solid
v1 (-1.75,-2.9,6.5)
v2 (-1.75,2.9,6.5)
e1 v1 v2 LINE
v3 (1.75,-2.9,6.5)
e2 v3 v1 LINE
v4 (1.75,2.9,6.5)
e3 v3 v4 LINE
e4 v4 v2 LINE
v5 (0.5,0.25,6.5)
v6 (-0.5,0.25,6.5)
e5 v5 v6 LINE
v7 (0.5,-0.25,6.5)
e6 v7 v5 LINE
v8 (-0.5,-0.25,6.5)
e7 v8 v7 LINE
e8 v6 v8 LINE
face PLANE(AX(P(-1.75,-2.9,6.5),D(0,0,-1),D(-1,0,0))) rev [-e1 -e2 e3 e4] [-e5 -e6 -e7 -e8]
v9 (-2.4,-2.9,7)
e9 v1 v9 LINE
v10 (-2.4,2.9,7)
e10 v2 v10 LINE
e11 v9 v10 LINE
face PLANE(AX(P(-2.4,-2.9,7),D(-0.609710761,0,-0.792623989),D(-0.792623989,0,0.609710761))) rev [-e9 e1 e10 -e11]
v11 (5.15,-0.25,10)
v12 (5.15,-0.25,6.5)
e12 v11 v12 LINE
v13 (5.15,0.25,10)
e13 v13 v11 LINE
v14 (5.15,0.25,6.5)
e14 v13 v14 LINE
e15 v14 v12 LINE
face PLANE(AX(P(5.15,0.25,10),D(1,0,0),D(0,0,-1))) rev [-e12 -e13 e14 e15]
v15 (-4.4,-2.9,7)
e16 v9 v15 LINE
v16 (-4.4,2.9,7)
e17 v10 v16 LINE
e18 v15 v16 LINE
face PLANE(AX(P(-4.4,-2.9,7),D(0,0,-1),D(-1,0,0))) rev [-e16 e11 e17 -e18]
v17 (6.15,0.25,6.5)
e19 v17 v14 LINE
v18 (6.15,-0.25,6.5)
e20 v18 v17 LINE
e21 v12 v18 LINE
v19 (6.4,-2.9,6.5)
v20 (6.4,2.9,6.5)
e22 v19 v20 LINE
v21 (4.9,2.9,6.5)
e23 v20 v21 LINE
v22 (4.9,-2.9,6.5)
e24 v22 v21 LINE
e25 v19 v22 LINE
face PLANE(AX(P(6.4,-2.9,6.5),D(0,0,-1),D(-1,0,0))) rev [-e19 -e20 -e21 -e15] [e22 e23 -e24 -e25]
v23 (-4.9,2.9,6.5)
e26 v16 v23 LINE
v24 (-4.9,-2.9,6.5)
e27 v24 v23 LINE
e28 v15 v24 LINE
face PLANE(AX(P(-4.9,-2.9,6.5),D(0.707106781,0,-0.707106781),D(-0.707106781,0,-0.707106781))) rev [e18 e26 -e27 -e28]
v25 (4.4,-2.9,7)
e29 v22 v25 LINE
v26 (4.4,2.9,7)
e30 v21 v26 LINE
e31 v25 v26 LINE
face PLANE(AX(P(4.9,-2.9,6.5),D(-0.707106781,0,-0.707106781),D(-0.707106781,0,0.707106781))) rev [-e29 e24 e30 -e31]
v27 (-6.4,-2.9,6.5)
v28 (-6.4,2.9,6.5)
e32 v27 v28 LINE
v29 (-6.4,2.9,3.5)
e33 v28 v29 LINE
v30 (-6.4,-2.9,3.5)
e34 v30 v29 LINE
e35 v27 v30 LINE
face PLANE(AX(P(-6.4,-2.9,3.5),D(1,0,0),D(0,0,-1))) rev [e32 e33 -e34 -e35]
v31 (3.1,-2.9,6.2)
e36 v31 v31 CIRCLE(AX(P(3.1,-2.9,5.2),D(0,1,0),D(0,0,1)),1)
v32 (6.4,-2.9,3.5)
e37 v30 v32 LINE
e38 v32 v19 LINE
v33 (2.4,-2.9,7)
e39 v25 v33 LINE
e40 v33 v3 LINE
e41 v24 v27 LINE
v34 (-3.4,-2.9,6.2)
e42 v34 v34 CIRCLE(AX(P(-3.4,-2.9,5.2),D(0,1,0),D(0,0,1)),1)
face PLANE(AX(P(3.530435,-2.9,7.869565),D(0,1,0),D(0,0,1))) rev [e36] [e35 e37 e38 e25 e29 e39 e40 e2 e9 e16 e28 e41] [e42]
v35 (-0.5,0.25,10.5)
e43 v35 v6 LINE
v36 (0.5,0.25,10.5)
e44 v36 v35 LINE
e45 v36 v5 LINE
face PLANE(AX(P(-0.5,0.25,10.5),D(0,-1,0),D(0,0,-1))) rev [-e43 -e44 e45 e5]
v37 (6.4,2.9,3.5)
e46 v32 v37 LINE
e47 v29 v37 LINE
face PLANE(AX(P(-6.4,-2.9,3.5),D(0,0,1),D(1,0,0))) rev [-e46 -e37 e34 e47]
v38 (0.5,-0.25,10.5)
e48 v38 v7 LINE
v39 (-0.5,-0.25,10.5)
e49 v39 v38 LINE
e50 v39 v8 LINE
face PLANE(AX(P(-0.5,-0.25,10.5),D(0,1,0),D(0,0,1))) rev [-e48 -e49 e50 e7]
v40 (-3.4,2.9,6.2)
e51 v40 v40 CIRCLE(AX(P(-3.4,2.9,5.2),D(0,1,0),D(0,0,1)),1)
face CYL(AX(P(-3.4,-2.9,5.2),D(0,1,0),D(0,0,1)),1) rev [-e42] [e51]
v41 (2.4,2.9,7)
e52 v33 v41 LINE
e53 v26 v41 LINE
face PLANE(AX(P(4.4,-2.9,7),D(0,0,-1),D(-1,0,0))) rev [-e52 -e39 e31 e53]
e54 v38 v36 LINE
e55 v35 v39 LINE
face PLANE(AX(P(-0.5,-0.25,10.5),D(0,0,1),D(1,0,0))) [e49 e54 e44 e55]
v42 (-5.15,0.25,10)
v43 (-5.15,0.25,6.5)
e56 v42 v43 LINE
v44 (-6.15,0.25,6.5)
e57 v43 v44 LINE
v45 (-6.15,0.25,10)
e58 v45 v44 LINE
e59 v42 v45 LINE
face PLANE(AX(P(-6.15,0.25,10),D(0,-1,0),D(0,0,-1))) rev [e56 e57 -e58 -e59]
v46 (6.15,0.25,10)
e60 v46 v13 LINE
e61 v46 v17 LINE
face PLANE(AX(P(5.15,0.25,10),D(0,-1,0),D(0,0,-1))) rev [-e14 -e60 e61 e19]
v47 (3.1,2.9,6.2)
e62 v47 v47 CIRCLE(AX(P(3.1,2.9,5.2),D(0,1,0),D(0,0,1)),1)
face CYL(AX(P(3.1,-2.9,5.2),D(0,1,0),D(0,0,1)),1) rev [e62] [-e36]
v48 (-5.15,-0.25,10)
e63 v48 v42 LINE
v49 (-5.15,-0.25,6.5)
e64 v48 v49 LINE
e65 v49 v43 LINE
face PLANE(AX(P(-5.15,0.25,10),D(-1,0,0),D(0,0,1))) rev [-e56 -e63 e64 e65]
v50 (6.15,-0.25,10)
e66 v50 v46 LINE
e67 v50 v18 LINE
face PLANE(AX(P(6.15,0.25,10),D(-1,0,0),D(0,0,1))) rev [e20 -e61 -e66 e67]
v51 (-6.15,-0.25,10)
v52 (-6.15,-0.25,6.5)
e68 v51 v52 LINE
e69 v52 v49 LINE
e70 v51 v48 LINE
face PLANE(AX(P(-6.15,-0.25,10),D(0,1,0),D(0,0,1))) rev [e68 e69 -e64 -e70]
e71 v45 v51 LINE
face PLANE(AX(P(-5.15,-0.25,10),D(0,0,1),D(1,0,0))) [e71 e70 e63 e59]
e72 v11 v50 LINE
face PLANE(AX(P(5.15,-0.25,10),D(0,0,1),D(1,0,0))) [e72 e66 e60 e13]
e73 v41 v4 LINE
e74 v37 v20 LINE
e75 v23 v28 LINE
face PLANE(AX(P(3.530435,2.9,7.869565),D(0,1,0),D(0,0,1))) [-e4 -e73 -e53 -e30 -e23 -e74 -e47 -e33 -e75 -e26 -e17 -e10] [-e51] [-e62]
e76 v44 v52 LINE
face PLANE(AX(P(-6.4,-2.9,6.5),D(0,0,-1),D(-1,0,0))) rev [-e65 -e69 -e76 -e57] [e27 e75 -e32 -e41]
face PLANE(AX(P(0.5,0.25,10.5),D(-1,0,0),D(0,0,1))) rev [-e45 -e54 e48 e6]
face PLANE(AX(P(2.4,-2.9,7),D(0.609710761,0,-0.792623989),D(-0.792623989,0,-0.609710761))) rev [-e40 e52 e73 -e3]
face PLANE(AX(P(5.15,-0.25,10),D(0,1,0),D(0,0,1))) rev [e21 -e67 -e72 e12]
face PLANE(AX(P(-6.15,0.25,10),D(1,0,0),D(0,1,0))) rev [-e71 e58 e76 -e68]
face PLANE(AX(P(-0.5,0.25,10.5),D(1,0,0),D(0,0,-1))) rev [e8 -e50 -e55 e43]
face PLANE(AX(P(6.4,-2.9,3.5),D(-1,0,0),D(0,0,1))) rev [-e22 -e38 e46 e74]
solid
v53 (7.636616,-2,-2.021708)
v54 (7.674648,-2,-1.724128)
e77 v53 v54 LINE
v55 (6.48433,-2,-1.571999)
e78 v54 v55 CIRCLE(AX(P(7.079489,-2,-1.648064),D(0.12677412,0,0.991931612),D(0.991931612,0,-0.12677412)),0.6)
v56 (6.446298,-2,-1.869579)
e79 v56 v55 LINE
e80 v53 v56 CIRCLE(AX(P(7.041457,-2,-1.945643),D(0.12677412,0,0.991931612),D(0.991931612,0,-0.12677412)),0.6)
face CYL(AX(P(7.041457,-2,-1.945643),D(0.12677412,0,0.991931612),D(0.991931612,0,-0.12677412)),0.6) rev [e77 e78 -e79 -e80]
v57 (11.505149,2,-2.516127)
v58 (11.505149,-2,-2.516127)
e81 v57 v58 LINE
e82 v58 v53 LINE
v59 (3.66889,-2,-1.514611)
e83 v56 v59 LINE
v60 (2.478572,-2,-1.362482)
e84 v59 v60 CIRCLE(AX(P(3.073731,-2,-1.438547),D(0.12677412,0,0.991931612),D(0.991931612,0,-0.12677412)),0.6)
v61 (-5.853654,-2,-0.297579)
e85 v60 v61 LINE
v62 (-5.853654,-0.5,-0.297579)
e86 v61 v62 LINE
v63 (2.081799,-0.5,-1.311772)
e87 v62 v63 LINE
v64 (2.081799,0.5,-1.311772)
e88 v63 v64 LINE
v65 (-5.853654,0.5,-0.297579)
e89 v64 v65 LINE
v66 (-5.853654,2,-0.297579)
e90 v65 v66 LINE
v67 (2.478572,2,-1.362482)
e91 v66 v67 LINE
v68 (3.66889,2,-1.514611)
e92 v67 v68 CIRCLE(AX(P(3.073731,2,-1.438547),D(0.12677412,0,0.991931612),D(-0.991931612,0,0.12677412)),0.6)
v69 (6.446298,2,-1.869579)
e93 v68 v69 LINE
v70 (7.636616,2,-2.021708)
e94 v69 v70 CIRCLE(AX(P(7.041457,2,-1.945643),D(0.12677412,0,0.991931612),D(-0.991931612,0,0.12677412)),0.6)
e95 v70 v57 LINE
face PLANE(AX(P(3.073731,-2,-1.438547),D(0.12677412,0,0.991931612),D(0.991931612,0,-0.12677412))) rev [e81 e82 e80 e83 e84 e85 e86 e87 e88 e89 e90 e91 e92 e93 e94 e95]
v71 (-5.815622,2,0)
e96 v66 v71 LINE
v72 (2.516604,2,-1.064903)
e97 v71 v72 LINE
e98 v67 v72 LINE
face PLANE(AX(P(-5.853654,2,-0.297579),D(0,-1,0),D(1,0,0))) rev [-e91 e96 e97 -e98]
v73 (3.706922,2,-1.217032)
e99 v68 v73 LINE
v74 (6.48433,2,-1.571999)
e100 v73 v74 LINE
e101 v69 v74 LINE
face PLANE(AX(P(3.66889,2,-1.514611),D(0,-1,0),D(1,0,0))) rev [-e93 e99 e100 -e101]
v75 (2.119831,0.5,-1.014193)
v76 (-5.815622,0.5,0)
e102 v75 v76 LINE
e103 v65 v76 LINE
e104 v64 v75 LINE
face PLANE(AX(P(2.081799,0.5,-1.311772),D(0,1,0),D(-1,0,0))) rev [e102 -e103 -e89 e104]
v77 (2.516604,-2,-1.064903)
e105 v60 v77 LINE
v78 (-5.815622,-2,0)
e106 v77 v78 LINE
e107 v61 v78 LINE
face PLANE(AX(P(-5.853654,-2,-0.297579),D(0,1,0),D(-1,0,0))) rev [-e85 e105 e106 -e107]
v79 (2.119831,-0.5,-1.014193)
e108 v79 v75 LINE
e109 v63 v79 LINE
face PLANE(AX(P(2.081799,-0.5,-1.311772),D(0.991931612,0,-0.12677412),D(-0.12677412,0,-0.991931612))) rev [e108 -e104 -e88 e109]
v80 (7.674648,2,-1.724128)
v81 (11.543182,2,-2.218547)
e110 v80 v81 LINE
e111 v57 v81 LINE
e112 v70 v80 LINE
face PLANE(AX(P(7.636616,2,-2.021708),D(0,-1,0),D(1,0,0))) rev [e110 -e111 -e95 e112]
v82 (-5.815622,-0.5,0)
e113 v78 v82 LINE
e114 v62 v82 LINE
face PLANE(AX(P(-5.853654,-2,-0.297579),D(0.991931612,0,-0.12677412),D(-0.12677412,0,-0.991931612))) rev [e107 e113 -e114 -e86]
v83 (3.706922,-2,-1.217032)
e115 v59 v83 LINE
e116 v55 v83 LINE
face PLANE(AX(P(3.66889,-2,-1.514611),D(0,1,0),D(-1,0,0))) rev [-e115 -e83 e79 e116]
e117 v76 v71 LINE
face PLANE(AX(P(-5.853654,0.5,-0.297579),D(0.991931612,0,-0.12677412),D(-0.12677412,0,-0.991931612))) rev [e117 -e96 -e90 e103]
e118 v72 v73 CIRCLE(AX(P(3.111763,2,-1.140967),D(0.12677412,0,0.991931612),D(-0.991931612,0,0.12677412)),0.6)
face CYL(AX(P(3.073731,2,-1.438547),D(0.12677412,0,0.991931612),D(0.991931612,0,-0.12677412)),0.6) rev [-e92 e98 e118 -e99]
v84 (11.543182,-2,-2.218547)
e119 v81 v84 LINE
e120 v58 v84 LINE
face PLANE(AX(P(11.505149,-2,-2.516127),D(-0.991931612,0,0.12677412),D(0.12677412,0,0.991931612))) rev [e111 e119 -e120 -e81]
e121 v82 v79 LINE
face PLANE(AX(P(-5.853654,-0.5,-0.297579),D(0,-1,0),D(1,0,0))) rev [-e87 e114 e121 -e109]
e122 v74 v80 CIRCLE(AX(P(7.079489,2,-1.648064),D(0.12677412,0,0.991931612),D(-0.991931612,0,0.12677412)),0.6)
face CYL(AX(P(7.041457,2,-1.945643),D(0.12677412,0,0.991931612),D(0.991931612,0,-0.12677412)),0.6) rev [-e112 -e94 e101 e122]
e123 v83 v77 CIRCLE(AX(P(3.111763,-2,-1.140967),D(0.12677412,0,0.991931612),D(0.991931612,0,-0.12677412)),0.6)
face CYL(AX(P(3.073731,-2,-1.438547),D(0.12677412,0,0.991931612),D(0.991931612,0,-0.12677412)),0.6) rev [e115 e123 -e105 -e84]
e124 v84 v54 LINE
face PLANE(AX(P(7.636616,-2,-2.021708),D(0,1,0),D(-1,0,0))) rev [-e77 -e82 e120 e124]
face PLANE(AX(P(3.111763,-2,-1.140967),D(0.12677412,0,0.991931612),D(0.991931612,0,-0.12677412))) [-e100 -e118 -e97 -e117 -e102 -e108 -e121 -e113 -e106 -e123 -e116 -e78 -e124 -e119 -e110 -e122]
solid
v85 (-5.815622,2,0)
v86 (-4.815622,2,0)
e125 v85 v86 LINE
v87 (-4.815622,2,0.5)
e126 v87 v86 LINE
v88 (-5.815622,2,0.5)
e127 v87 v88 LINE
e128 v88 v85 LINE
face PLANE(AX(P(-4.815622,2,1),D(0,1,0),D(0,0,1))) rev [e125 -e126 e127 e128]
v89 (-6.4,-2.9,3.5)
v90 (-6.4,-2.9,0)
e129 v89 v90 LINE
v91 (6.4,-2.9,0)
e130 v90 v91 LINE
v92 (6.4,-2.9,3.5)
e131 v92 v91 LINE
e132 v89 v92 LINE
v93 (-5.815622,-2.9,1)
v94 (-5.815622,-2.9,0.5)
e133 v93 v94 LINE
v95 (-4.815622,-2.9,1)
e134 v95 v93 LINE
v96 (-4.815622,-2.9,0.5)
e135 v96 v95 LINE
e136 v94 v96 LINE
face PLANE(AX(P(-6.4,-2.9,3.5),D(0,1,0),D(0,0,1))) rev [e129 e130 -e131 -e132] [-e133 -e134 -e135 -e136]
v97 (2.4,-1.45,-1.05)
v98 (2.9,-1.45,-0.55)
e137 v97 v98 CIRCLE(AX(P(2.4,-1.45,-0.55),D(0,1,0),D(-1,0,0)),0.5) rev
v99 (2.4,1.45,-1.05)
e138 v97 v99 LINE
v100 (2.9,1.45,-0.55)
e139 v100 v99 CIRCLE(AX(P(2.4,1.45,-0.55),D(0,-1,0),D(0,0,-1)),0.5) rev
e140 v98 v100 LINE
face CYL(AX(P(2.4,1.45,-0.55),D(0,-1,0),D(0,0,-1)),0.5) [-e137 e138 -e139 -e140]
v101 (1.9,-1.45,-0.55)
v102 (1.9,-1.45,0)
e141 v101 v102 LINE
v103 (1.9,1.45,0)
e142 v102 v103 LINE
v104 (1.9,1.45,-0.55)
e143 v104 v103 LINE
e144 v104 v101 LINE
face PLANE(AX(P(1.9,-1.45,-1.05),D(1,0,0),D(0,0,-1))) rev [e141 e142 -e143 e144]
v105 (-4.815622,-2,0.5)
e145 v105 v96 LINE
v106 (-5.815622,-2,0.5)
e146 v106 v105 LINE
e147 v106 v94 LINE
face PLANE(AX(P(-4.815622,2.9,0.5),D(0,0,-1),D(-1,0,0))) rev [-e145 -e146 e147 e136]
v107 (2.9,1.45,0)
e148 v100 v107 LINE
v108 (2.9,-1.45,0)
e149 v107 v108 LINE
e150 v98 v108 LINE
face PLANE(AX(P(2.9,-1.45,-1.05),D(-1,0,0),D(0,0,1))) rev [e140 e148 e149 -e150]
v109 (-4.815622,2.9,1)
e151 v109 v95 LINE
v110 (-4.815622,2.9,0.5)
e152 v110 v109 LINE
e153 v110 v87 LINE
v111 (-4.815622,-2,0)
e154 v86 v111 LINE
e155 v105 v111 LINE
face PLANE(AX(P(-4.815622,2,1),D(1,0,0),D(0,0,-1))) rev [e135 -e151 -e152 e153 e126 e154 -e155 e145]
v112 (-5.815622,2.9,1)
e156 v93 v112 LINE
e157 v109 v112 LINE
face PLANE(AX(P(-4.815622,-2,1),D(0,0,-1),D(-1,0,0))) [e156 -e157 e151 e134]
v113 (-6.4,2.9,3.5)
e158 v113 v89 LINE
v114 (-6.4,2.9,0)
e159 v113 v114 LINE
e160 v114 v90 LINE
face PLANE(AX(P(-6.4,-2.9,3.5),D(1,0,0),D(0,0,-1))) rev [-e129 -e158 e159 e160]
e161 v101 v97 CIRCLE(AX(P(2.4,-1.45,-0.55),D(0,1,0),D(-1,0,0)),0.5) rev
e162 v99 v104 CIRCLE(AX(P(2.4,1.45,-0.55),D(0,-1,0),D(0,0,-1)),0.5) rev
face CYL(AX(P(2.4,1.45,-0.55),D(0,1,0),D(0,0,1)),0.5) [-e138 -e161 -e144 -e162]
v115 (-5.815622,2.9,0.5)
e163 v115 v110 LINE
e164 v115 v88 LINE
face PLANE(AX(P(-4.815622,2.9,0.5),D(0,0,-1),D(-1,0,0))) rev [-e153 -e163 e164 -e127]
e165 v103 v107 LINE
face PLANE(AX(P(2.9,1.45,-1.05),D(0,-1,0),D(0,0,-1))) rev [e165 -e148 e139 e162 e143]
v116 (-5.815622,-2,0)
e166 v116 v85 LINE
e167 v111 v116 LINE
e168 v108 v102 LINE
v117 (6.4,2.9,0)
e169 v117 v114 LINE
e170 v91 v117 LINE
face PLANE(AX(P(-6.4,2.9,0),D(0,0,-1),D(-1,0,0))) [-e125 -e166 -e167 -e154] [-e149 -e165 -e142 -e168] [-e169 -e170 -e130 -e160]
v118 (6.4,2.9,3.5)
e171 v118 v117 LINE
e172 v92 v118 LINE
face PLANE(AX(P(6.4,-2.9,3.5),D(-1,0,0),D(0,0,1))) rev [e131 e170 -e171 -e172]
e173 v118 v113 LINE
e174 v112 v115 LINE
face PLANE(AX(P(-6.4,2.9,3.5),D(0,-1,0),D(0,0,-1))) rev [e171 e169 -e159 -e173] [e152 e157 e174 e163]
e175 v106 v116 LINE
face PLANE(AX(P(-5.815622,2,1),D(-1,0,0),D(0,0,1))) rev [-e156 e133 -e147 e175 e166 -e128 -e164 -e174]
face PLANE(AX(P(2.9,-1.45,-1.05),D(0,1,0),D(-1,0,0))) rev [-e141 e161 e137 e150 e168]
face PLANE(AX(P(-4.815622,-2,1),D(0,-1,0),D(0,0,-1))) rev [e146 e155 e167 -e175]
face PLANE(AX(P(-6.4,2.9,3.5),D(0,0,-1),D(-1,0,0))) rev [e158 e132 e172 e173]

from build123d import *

# Parameters (mm, degrees)
SKETCH_1_W            = 12.8
SKETCH_1_H            = 5.8
EXTRUDE_1_DEPTH       = 3.5
SKETCH_2_W            = 1
SKETCH_2_H            = 2.9
EXTRUDE_2_DEPTH       = 1.05
FILLET_1_R            = 0.5
SKETCH_3_W            = 1
SKETCH_3_H            = 4
CUT_EXTRUDE_1_DEPTH   = 1
SKETCH_4_W            = 1
SKETCH_4_H            = 0.5
CUT_EXTRUDE_2_DEPTH   = 10.31933474
EXTRUDE_110_DEPTH     = 5.8
SKETCH_6_W            = 1
SKETCH_6_H            = 0.5
EXTRUDE_3_DEPTH       = 4
SKETCH_5_W            = 1
SKETCH_5_H            = 0.5
EXTRUDE_210_DEPTH     = 3.5
SKETCH_7_R            = 1
CUT_EXTRUDE_110_DEPTH = 17.293966082
EXTRUDE_212_DEPTH     = 0.3


with BuildPart() as part:
    # Эскиз1 → Вытянуть1 (new body)
    with BuildSketch(Plane.XY):
        Rectangle(SKETCH_1_W, SKETCH_1_H)
    extrude(amount=EXTRUDE_1_DEPTH)

    # Эскиз2 → Вытянуть2 (add)
    with BuildSketch(Plane(origin=(0, 0, 0), x_dir=(-1, 0, 0), z_dir=(0, 0, -1))):
        with Locations((-2.4, 0)):
            Rectangle(SKETCH_2_W, SKETCH_2_H)
    extrude(amount=EXTRUDE_2_DEPTH)

    # Скругление1
    fillet_1_edges = [part.edges().sort_by_distance(p)[0] for p in [
        (2.9, 0, -1.05),
        (1.9, 0, -1.05),
    ]]
    fillet(fillet_1_edges, radius=FILLET_1_R - 0.0001)  # a hair under: the kernel refuses the full size

    # Эскиз3 → Вырез-Вытянуть1 (cut)
    with BuildSketch(Plane(origin=(0, 0, 0), x_dir=(-1, 0, 0), z_dir=(0, 0, -1))):
        with Locations((5.31562156, 0)):
            Rectangle(SKETCH_3_W, SKETCH_3_H)
    extrude(amount=-CUT_EXTRUDE_1_DEPTH, mode=Mode.SUBTRACT)

    # Эскиз4 → Вырез-Вытянуть2 (cut, through all)
    with BuildSketch(Plane.XZ.offset(2.9)):
        with Locations((-5.31562156, 0.75)):
            Rectangle(SKETCH_4_W, SKETCH_4_H)
    extrude(amount=-CUT_EXTRUDE_2_DEPTH, mode=Mode.SUBTRACT)


with BuildPart() as body_2:
    # Эскиз110 → Вытянуть110 (new body)
    with BuildSketch(Plane(origin=(1.592474691, 2.9, -4.760466002), x_dir=(1, 0, 0), z_dir=(0, -1, 0))):
        Polygon((-7.992474691, 8.260466002), (4.807525309, 8.260466002), (4.807525309, 11.260466002), (3.307525309, 11.260466002), (2.807525309, 11.760466002), (0.807525309, 11.760466002), (0.157525309, 11.260466002), (-3.342474691, 11.260466002), (-3.992474691, 11.760466002), (-5.992474691, 11.760466002), (-6.492474691, 11.260466002), (-7.992474691, 11.260466002), align=None)
    extrude(amount=EXTRUDE_110_DEPTH)

    # Эскиз6 → Вытянуть3 (add)
    with BuildSketch(Plane(origin=(-1.592474691, 3.5, 6.5), x_dir=(1, 0, 0), z_dir=(0, 0, 1))):
        with Locations((1.592474691, -3.5)):
            Rectangle(SKETCH_6_W, SKETCH_6_H)
    extrude(amount=EXTRUDE_3_DEPTH)

    # Эскиз5 → Вытянуть210 (add)
    with BuildSketch(Plane(origin=(-1.592474691, 3.5, 6.5), x_dir=(1, 0, 0), z_dir=(0, 0, 1))):
        with Locations((-4.057525309, -3.5)):
            Rectangle(SKETCH_5_W, SKETCH_5_H)
        with Locations((7.242474691, -3.5)):
            Rectangle(SKETCH_5_W, SKETCH_5_H)
    extrude(amount=EXTRUDE_210_DEPTH)

    # Эскиз7 → Вырез-Вытянуть110 (cut, through all)
    with BuildSketch(Plane(origin=(1.592474691, 2.9, -2.460466002), x_dir=(-1, 0, 0), z_dir=(0, 1, 0))):
        with Locations(Location((-1.507525309, 7.660466002, 0), (0, 0, 90))):
            Circle(SKETCH_7_R)
        with Locations(Location((4.992474691, 7.660466002, 0), (0, 0, 90))):
            Circle(SKETCH_7_R)
    extrude(amount=-CUT_EXTRUDE_110_DEPTH, mode=Mode.SUBTRACT)


with BuildPart() as body_3:
    # Эскиз111 → Вытянуть212 (new body)
    with BuildSketch(Plane(origin=(-0.093466794, 0, -0.731321722), x_dir=(-0.9919316118223265, 0, 0.1267741198650638), z_dir=(-0.12677411986506376, 0, -0.9919316118223264))):
        with BuildLine():
            Line((5.768698868, -0.5), (-2.231301132, -0.5))
            Line((-2.231301132, -0.5), (-2.231301132, 0.5))
            Line((-2.231301132, 0.5), (5.768698868, 0.5))
            Line((5.768698868, 0.5), (5.768698868, 2))
            Line((5.768698868, 2), (-2.631301132, 2))
            ThreePointArc((-2.631301132, 2), (-3.231301132, 1.4), (-3.831301132, 2))
            Line((-3.831301132, 2), (-6.631301132, 2))
            ThreePointArc((-6.631301132, 2), (-7.231301132, 1.4), (-7.831301132, 2))
            Line((-7.831301132, 2), (-11.731301132, 2))
            Line((-11.731301132, 2), (-11.731301132, -2))
            Line((-11.731301132, -2), (-7.831301132, -2))
            ThreePointArc((-7.831301132, -2), (-7.231301132, -1.4), (-6.631301132, -2))
            Line((-6.631301132, -2), (-3.831301132, -2))
            ThreePointArc((-3.831301132, -2), (-3.231301132, -1.4), (-2.631301132, -2))
            Line((-2.631301132, -2), (5.768698868, -2))
            Line((5.768698868, -2), (5.768698868, -0.5))
        make_face()
    extrude(amount=EXTRUDE_212_DEPTH)


solid = Compound([part.part, body_2.part, body_3.part])
